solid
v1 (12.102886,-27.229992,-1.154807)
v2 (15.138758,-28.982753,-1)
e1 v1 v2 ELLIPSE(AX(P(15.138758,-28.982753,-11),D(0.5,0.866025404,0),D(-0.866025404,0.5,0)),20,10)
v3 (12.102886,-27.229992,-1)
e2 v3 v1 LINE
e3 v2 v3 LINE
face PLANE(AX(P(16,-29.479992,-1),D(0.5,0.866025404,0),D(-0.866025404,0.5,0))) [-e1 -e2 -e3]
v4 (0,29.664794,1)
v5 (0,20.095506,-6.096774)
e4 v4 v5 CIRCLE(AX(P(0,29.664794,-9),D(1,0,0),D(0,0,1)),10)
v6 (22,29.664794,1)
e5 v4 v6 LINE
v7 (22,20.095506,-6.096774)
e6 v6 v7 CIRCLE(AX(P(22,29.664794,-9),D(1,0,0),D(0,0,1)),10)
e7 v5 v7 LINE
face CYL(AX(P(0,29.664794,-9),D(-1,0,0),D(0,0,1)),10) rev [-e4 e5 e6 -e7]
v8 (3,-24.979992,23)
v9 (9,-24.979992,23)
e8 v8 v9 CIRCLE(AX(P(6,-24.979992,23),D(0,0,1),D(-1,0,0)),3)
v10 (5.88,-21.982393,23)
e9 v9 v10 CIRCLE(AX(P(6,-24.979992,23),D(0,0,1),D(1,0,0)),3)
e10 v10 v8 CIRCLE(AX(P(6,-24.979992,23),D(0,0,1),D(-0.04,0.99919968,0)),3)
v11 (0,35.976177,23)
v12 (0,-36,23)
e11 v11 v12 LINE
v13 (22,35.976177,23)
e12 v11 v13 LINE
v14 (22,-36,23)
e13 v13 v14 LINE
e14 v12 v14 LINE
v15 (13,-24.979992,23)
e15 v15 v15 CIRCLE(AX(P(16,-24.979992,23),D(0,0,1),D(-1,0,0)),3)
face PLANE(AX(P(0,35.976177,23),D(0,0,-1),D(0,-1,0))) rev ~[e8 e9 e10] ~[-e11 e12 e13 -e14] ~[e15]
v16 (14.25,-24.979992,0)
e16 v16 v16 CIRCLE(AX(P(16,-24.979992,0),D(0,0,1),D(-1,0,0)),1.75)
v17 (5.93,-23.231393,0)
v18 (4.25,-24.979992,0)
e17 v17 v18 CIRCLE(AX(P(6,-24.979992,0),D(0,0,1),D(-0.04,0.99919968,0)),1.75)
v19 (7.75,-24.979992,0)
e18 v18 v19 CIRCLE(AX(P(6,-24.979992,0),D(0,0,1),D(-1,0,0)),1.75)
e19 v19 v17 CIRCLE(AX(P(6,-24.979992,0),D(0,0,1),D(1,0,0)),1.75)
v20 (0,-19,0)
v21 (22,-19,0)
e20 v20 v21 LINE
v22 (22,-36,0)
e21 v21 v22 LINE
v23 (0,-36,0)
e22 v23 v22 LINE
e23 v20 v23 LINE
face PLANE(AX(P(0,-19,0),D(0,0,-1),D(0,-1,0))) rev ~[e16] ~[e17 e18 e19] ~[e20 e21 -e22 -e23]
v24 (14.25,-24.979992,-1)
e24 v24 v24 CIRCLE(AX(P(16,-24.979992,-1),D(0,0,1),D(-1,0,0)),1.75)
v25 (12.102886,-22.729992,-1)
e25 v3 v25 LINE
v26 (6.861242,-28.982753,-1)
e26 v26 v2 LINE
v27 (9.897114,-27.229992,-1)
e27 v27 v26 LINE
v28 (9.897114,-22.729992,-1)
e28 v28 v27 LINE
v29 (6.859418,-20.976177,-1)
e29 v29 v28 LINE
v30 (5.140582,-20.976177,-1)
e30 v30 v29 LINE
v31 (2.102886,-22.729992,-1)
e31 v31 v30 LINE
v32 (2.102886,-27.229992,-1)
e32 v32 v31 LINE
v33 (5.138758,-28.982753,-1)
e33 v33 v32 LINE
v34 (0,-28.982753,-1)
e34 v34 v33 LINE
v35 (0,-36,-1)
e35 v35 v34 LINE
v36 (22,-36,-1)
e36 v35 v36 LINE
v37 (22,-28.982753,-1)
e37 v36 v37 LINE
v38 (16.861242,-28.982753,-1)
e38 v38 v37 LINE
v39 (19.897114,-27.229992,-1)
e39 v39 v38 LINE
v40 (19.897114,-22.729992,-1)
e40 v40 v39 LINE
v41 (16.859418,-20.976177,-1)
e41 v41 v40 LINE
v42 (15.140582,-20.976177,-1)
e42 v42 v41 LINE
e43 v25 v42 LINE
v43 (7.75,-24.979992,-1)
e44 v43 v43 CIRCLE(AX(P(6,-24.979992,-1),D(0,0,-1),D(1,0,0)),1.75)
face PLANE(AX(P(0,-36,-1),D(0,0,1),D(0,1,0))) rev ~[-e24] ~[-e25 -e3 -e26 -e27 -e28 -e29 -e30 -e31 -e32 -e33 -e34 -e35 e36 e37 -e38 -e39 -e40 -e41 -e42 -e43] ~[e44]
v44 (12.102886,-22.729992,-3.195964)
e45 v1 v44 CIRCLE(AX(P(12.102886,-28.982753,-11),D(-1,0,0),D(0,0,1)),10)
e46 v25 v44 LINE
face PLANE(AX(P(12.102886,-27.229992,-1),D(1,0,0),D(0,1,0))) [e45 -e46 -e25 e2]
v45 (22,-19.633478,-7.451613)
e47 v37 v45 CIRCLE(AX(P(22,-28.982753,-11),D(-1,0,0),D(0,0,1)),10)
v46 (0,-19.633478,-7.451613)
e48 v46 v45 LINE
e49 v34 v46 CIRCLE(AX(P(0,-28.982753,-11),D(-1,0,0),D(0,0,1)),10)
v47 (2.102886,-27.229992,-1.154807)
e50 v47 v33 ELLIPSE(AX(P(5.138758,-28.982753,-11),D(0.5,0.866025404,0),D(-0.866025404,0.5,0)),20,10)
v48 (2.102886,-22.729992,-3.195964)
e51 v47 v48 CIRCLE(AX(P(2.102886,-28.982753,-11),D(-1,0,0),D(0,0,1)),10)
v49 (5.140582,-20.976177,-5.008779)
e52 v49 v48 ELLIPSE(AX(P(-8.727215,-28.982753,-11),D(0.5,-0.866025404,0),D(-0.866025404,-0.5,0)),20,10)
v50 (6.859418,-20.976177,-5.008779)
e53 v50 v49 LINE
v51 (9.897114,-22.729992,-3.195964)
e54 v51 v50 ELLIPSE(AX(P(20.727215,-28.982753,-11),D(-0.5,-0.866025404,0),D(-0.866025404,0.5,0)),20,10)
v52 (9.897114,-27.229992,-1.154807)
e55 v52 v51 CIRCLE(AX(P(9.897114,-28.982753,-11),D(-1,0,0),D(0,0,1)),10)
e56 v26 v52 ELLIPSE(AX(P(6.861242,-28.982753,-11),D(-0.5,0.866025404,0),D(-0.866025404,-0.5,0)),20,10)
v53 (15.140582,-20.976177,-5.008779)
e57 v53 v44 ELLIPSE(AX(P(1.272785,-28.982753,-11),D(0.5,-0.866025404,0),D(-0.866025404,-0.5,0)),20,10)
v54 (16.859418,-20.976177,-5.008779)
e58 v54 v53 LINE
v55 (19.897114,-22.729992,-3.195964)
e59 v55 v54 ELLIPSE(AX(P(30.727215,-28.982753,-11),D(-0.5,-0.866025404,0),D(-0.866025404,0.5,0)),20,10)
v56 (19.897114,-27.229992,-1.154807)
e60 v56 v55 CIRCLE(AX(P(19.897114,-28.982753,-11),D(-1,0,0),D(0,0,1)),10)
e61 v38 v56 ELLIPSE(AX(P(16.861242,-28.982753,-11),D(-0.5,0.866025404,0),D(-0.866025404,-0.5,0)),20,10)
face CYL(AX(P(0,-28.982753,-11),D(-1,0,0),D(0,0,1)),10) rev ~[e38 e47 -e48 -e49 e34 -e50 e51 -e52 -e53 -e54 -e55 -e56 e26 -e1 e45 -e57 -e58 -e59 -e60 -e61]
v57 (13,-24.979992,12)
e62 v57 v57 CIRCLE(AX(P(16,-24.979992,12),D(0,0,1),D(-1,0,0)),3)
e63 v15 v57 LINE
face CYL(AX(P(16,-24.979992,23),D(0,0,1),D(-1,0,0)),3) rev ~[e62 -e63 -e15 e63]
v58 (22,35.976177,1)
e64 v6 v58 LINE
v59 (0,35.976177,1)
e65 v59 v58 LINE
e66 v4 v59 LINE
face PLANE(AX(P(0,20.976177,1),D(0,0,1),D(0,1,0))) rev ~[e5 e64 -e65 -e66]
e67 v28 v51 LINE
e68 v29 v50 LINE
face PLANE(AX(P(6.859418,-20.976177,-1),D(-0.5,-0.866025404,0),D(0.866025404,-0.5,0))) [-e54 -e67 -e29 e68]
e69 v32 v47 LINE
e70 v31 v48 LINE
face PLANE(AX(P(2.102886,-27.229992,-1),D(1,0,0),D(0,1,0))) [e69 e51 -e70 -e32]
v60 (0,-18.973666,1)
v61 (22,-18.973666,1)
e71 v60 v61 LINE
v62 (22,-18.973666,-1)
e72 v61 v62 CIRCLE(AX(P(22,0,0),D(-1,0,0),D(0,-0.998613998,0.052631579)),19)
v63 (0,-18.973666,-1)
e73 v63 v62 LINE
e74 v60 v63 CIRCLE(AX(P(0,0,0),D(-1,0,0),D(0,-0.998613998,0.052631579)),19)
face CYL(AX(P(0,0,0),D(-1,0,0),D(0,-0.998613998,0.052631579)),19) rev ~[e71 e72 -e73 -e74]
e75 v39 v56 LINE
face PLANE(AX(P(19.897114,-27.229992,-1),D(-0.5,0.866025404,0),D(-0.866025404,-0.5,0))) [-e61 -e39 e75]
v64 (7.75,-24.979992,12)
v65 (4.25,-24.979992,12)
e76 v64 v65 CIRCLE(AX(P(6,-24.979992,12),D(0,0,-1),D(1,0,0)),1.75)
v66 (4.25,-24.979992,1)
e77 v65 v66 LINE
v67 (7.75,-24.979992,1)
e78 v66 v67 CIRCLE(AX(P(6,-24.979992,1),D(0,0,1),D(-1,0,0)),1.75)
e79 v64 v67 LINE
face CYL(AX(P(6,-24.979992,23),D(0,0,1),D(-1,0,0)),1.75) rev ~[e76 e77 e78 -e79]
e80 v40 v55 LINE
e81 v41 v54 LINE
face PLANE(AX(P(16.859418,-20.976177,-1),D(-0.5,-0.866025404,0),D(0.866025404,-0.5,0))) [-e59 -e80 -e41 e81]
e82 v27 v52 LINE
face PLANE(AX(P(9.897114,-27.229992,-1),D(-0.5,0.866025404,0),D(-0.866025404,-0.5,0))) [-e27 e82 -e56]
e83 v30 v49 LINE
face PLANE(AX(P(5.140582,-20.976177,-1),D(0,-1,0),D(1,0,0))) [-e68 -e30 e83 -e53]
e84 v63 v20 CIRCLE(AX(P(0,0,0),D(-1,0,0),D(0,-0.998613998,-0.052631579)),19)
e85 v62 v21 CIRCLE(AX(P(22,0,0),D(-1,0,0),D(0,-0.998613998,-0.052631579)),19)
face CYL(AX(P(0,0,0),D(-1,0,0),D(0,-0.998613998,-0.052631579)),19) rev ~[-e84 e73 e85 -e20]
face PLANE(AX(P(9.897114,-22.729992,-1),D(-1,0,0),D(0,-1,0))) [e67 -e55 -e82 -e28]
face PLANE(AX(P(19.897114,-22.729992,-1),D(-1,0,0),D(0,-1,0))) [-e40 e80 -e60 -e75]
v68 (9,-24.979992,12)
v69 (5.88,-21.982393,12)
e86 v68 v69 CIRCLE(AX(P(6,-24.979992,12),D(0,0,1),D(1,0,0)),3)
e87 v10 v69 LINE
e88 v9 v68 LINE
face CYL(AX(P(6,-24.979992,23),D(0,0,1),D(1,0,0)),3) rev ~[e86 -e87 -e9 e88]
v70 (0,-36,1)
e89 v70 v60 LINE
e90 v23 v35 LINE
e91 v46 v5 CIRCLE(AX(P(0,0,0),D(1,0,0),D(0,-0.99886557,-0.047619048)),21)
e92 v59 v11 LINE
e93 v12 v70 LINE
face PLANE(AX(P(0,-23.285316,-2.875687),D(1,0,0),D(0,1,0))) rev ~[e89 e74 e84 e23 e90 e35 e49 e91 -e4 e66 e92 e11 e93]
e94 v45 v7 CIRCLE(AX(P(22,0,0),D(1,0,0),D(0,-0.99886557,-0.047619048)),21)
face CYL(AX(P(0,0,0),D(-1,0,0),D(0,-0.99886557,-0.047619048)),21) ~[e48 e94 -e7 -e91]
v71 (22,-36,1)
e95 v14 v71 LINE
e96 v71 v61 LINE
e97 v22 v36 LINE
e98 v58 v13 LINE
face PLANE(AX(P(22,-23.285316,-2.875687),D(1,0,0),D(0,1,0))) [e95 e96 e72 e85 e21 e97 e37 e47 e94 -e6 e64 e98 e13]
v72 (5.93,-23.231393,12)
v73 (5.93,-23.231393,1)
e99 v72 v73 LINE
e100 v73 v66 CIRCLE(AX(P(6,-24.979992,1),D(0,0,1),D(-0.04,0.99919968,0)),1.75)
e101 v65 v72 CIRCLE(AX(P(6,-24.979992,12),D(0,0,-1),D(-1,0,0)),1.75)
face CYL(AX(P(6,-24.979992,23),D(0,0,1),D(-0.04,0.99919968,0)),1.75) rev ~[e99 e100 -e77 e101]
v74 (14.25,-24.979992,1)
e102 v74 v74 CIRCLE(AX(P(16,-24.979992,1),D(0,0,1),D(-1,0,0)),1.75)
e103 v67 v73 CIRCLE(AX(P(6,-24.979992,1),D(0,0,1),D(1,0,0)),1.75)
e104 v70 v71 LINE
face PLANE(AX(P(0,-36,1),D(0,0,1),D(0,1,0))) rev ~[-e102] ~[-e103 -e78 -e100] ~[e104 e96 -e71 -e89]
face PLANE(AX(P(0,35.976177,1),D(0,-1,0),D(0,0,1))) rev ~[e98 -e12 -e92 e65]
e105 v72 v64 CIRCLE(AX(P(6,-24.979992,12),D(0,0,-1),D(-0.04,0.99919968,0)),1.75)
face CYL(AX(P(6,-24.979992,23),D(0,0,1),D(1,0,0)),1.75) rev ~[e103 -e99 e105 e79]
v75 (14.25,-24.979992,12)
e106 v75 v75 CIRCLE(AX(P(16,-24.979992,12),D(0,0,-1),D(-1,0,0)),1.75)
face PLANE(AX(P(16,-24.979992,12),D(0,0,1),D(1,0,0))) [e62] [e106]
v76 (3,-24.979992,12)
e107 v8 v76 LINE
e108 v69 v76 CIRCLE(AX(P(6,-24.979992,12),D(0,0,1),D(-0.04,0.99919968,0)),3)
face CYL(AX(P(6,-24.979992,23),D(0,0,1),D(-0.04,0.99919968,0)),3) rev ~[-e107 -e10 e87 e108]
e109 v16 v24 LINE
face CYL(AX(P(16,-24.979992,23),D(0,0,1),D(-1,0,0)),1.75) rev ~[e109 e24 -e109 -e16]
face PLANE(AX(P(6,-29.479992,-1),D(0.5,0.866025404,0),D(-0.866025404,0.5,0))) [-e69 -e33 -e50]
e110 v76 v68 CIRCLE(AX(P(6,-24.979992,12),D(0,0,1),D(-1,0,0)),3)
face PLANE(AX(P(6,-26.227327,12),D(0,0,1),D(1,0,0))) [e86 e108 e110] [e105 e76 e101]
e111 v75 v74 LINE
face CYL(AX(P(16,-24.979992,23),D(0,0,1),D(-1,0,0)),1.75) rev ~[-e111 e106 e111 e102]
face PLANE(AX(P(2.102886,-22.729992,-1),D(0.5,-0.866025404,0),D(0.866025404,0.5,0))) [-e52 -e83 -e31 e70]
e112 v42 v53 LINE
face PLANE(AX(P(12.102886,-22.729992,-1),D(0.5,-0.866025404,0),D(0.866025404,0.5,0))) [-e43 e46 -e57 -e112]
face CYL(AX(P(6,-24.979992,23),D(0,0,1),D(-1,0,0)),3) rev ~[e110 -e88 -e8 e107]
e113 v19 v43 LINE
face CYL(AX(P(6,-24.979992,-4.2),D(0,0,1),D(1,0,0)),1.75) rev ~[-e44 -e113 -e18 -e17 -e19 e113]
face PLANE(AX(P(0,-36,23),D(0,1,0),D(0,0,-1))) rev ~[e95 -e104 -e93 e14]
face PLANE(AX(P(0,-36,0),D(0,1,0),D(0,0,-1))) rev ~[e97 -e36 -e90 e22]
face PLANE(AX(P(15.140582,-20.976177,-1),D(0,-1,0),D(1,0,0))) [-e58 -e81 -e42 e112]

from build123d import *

# Parameters (mm, degrees)
F1_DEPTH     = 22
F3_DEPTH     = 25
F4_DEPTH     = 11
F5_R         = 1.75
F6_DEPTH     = 20
F7_T1_DEPTH  = 22
F7_T6_DEPTH  = 22
F7_S7_R      = 1.75
F7_T8_DEPTH  = 14
F7_S9_R      = 1.75
F7_T10_DEPTH = 14


# Not quite as in the source:
# - a fillet or chamfer that OpenCascade refuses, or shapes differently, is made with other operations: its cross-section is extruded or revolved along the edge and cut away or added
# - after a boolean that leaves OpenCascade's solid faulty, fix() repairs it


with BuildPart() as f1:
    # F0 (on Right) → F1 (new body)
    with BuildSketch(Plane.YZ):
        with BuildLine():
            ThreePointArc((-20.9761769634, 1), (0, 21), (20.9761769634, 1))
            Line((20.9761769634, 1), (35.9761769634, 1))
            Line((35.9761769634, 1), (35.9761769634, 23))
            Line((35.9761769634, 23), (-36, 23))
            Line((-36, 23), (-36, 1))
            Line((-36, 1), (-20.9761769634, 1))
        make_face()
        with BuildLine():
            ThreePointArc((-18.973665961, -1), (-18.9934153493, -0.5001733404), (-19, 0))
            Line((-19, 0), (-21, 0))
            ThreePointArc((-21, 0), (-20.9940433961, -0.5001418641), (-20.9761769634, -1))
            Line((-20.9761769634, -1), (-18.973665961, -1))
        make_face()
        with BuildLine():
            ThreePointArc((18.973665961, 1), (1, -18.973665961), (-18.973665961, -1))
            Line((-18.973665961, -1), (-20.9761769634, -1))
            ThreePointArc((-20.9761769634, -1), (1, -20.9761769634), (20.9761769634, 1))
            Line((20.9761769634, 1), (18.973665961, 1))
        make_face()
        with BuildLine():
            ThreePointArc((-18.973665961, 1), (0, 19), (18.973665961, 1))
            Line((18.973665961, 1), (20.9761769634, 1))
            ThreePointArc((20.9761769634, 1), (0, 21), (-20.9761769634, 1))
            Line((-20.9761769634, 1), (-18.973665961, 1))
        make_face()
        with BuildLine():
            ThreePointArc((-20.9761769634, -1), (-20.9940433961, -0.5001418641), (-21, 0))
            Line((-21, 0), (-36, 0))
            Line((-36, 0), (-36, -1))
            Line((-36, -1), (-20.9761769634, -1))
        make_face()
    extrude(amount=F1_DEPTH)

    # F2 (on face) → F3 (cut)
    with BuildSketch(Plane.XY.offset(23)):
        with BuildLine():
            ThreePointArc((4.25, -24.9799919936), (6, -26.7299919936), (7.75, -24.9799919936))
            Line((7.75, -24.9799919936), (6, -24.9799919936))
            Line((6, -24.9799919936), (4.25, -24.9799919936))
        make_face()
        with BuildLine():
            Line((6, -24.9799919936), (5.93, -23.231392554))
            ThreePointArc((5.93, -23.231392554), (4.7380570536, -23.7675564283), (4.25, -24.9799919936))
            Line((4.25, -24.9799919936), (6, -24.9799919936))
        make_face()
        with BuildLine():
            Line((6, -24.9799919936), (7.75, -24.9799919936))
            ThreePointArc((7.75, -24.9799919936), (7.2124355653, -23.7180490472), (5.93, -23.231392554))
            Line((5.93, -23.231392554), (6, -24.9799919936))
        make_face()
        with BuildLine():
            ThreePointArc((17.75, -24.9799919936), (16, -23.2299919936), (14.25, -24.9799919936))
            ThreePointArc((14.25, -24.9799919936), (16, -26.7299919936), (17.75, -24.9799919936))
        make_face()
    extrude(amount=-F3_DEPTH, mode=Mode.SUBTRACT)

    # F2 (on face) → F4 (cut)
    with BuildSketch(Plane.XY.offset(23)):
        with BuildLine():
            Line((9, -24.9799919936), (7.75, -24.9799919936))
            ThreePointArc((7.75, -24.9799919936), (6, -26.7299919936), (4.25, -24.9799919936))
            Line((4.25, -24.9799919936), (3, -24.9799919936))
            ThreePointArc((3, -24.9799919936), (6, -27.9799919936), (9, -24.9799919936))
        make_face()
        with BuildLine():
            ThreePointArc((4.25, -24.9799919936), (4.7380570536, -23.7675564283), (5.93, -23.231392554))
            Line((5.93, -23.231392554), (5.88, -21.9823929544))
            ThreePointArc((5.88, -21.9823929544), (3.8366692347, -22.9015310245), (3, -24.9799919936))
            Line((3, -24.9799919936), (4.25, -24.9799919936))
        make_face()
        with BuildLine():
            ThreePointArc((5.93, -23.231392554), (7.2124355653, -23.7180490472), (7.75, -24.9799919936))
            Line((7.75, -24.9799919936), (9, -24.9799919936))
            ThreePointArc((9, -24.9799919936), (8.0784609691, -22.8166612283), (5.88, -21.9823929544))
            Line((5.88, -21.9823929544), (5.93, -23.231392554))
        make_face()
        with BuildLine():
            ThreePointArc((19, -24.9799919936), (16, -21.9799919936), (13, -24.9799919936))
            ThreePointArc((13, -24.9799919936), (16, -27.9799919936), (19, -24.9799919936))
        make_face()
        with BuildLine():
            ThreePointArc((17.75, -24.9799919936), (16, -26.7299919936), (14.25, -24.9799919936))
            ThreePointArc((14.25, -24.9799919936), (16, -23.2299919936), (17.75, -24.9799919936))
        make_face(mode=Mode.SUBTRACT)
    extrude(amount=-F4_DEPTH, mode=Mode.SUBTRACT)

    # F7: fillet of radius 10 on 2 edges, made by hand

    # F7_s2 → F7_t1 (join)
    with BuildSketch(Plane.YZ):
        with BuildLine():
            ThreePointArc((29.6647939484, 1), (23.7079599766, -0.967806711), (20.095505578, -6.0967741935))
            ThreePointArc((20.095505578, -6.0967741935), (20.8401494161, -2.5861500957), (20.9761769634, 1))
            Line((20.9761769634, 1), (29.6647939484, 1))
        make_face()
    extrude(amount=F7_T1_DEPTH)


with BuildPart() as f6:
    # F5 (on face) → F6 (new body)
    with BuildSketch(Plane(origin=(0, 0, -1), x_dir=(1, 0, 0), z_dir=(0, 0, -1))):
        Polygon((19.897114317, 27.2299919936), (16, 29.4799919936), (12.102885683, 27.2299919936), (12.102885683, 22.7299919936), (15.1405824223, 20.9761769634), (16.8594175777, 20.9761769634), (19.897114317, 22.7299919936), align=None)
        with Locations((16, 24.9799919936)):
            Circle(F5_R, mode=Mode.SUBTRACT)
    extrude(amount=F6_DEPTH)


with BuildPart() as f6b:
    # F5 (on face) → F6, piece 2 (new body)
    with BuildSketch(Plane(origin=(0, 0, -1), x_dir=(1, 0, 0), z_dir=(0, 0, -1))):
        Polygon((5.1405824223, 20.9761769634), (6.8594175777, 20.9761769634), (9.897114317, 22.7299919936), (9.897114317, 27.2299919936), (6, 29.4799919936), (2.102885683, 27.2299919936), (2.102885683, 22.7299919936), align=None)
        with Locations((6, 24.9799919936)):
            Circle(F5_R, mode=Mode.SUBTRACT)
    extrude(amount=F6_DEPTH)


with BuildPart() as f7_tool4:
    # F7_s5 → F7_t6 (new body)
    with BuildSketch(Plane.YZ):
        with BuildLine():
            ThreePointArc((-28.9827534924, -1), (-23.3031351499, -2.7694510825), (-19.6334781723, -7.4516129032))
            ThreePointArc((-19.6334781723, -7.4516129032), (-20.5594710492, -4.2788024233), (-20.9761769634, -1))
            Line((-20.9761769634, -1), (-28.9827534924, -1))
        make_face()
    extrude(amount=F7_T6_DEPTH)

    # F7_s7 → F7_t8 (cut, symmetric)
    with BuildSketch(Plane.XY.offset(-4.2)):
        with Locations((16, -24.9799919936)):
            Circle(F7_S7_R)
    extrude(amount=F7_T8_DEPTH, both=True, mode=Mode.SUBTRACT)

    # F7_s9 → F7_t10 (cut, symmetric)
    with BuildSketch(Plane.XY.offset(-4.2)):
        with Locations((6, -24.9799919936)):
            Circle(F7_S9_R)
    extrude(amount=F7_T10_DEPTH, both=True, mode=Mode.SUBTRACT)


with BuildPart() as f1_1:
    add(f1.part)

    # F7_t3: union F7_tool4
    add(f7_tool4.part)

    # F8: cut F6, F6b
    add(f6.part, mode=Mode.SUBTRACT)
    add(f6b.part, mode=Mode.SUBTRACT)

    add(f1_1.part.fix(), mode=Mode.REPLACE)


solid = f1_1.part
